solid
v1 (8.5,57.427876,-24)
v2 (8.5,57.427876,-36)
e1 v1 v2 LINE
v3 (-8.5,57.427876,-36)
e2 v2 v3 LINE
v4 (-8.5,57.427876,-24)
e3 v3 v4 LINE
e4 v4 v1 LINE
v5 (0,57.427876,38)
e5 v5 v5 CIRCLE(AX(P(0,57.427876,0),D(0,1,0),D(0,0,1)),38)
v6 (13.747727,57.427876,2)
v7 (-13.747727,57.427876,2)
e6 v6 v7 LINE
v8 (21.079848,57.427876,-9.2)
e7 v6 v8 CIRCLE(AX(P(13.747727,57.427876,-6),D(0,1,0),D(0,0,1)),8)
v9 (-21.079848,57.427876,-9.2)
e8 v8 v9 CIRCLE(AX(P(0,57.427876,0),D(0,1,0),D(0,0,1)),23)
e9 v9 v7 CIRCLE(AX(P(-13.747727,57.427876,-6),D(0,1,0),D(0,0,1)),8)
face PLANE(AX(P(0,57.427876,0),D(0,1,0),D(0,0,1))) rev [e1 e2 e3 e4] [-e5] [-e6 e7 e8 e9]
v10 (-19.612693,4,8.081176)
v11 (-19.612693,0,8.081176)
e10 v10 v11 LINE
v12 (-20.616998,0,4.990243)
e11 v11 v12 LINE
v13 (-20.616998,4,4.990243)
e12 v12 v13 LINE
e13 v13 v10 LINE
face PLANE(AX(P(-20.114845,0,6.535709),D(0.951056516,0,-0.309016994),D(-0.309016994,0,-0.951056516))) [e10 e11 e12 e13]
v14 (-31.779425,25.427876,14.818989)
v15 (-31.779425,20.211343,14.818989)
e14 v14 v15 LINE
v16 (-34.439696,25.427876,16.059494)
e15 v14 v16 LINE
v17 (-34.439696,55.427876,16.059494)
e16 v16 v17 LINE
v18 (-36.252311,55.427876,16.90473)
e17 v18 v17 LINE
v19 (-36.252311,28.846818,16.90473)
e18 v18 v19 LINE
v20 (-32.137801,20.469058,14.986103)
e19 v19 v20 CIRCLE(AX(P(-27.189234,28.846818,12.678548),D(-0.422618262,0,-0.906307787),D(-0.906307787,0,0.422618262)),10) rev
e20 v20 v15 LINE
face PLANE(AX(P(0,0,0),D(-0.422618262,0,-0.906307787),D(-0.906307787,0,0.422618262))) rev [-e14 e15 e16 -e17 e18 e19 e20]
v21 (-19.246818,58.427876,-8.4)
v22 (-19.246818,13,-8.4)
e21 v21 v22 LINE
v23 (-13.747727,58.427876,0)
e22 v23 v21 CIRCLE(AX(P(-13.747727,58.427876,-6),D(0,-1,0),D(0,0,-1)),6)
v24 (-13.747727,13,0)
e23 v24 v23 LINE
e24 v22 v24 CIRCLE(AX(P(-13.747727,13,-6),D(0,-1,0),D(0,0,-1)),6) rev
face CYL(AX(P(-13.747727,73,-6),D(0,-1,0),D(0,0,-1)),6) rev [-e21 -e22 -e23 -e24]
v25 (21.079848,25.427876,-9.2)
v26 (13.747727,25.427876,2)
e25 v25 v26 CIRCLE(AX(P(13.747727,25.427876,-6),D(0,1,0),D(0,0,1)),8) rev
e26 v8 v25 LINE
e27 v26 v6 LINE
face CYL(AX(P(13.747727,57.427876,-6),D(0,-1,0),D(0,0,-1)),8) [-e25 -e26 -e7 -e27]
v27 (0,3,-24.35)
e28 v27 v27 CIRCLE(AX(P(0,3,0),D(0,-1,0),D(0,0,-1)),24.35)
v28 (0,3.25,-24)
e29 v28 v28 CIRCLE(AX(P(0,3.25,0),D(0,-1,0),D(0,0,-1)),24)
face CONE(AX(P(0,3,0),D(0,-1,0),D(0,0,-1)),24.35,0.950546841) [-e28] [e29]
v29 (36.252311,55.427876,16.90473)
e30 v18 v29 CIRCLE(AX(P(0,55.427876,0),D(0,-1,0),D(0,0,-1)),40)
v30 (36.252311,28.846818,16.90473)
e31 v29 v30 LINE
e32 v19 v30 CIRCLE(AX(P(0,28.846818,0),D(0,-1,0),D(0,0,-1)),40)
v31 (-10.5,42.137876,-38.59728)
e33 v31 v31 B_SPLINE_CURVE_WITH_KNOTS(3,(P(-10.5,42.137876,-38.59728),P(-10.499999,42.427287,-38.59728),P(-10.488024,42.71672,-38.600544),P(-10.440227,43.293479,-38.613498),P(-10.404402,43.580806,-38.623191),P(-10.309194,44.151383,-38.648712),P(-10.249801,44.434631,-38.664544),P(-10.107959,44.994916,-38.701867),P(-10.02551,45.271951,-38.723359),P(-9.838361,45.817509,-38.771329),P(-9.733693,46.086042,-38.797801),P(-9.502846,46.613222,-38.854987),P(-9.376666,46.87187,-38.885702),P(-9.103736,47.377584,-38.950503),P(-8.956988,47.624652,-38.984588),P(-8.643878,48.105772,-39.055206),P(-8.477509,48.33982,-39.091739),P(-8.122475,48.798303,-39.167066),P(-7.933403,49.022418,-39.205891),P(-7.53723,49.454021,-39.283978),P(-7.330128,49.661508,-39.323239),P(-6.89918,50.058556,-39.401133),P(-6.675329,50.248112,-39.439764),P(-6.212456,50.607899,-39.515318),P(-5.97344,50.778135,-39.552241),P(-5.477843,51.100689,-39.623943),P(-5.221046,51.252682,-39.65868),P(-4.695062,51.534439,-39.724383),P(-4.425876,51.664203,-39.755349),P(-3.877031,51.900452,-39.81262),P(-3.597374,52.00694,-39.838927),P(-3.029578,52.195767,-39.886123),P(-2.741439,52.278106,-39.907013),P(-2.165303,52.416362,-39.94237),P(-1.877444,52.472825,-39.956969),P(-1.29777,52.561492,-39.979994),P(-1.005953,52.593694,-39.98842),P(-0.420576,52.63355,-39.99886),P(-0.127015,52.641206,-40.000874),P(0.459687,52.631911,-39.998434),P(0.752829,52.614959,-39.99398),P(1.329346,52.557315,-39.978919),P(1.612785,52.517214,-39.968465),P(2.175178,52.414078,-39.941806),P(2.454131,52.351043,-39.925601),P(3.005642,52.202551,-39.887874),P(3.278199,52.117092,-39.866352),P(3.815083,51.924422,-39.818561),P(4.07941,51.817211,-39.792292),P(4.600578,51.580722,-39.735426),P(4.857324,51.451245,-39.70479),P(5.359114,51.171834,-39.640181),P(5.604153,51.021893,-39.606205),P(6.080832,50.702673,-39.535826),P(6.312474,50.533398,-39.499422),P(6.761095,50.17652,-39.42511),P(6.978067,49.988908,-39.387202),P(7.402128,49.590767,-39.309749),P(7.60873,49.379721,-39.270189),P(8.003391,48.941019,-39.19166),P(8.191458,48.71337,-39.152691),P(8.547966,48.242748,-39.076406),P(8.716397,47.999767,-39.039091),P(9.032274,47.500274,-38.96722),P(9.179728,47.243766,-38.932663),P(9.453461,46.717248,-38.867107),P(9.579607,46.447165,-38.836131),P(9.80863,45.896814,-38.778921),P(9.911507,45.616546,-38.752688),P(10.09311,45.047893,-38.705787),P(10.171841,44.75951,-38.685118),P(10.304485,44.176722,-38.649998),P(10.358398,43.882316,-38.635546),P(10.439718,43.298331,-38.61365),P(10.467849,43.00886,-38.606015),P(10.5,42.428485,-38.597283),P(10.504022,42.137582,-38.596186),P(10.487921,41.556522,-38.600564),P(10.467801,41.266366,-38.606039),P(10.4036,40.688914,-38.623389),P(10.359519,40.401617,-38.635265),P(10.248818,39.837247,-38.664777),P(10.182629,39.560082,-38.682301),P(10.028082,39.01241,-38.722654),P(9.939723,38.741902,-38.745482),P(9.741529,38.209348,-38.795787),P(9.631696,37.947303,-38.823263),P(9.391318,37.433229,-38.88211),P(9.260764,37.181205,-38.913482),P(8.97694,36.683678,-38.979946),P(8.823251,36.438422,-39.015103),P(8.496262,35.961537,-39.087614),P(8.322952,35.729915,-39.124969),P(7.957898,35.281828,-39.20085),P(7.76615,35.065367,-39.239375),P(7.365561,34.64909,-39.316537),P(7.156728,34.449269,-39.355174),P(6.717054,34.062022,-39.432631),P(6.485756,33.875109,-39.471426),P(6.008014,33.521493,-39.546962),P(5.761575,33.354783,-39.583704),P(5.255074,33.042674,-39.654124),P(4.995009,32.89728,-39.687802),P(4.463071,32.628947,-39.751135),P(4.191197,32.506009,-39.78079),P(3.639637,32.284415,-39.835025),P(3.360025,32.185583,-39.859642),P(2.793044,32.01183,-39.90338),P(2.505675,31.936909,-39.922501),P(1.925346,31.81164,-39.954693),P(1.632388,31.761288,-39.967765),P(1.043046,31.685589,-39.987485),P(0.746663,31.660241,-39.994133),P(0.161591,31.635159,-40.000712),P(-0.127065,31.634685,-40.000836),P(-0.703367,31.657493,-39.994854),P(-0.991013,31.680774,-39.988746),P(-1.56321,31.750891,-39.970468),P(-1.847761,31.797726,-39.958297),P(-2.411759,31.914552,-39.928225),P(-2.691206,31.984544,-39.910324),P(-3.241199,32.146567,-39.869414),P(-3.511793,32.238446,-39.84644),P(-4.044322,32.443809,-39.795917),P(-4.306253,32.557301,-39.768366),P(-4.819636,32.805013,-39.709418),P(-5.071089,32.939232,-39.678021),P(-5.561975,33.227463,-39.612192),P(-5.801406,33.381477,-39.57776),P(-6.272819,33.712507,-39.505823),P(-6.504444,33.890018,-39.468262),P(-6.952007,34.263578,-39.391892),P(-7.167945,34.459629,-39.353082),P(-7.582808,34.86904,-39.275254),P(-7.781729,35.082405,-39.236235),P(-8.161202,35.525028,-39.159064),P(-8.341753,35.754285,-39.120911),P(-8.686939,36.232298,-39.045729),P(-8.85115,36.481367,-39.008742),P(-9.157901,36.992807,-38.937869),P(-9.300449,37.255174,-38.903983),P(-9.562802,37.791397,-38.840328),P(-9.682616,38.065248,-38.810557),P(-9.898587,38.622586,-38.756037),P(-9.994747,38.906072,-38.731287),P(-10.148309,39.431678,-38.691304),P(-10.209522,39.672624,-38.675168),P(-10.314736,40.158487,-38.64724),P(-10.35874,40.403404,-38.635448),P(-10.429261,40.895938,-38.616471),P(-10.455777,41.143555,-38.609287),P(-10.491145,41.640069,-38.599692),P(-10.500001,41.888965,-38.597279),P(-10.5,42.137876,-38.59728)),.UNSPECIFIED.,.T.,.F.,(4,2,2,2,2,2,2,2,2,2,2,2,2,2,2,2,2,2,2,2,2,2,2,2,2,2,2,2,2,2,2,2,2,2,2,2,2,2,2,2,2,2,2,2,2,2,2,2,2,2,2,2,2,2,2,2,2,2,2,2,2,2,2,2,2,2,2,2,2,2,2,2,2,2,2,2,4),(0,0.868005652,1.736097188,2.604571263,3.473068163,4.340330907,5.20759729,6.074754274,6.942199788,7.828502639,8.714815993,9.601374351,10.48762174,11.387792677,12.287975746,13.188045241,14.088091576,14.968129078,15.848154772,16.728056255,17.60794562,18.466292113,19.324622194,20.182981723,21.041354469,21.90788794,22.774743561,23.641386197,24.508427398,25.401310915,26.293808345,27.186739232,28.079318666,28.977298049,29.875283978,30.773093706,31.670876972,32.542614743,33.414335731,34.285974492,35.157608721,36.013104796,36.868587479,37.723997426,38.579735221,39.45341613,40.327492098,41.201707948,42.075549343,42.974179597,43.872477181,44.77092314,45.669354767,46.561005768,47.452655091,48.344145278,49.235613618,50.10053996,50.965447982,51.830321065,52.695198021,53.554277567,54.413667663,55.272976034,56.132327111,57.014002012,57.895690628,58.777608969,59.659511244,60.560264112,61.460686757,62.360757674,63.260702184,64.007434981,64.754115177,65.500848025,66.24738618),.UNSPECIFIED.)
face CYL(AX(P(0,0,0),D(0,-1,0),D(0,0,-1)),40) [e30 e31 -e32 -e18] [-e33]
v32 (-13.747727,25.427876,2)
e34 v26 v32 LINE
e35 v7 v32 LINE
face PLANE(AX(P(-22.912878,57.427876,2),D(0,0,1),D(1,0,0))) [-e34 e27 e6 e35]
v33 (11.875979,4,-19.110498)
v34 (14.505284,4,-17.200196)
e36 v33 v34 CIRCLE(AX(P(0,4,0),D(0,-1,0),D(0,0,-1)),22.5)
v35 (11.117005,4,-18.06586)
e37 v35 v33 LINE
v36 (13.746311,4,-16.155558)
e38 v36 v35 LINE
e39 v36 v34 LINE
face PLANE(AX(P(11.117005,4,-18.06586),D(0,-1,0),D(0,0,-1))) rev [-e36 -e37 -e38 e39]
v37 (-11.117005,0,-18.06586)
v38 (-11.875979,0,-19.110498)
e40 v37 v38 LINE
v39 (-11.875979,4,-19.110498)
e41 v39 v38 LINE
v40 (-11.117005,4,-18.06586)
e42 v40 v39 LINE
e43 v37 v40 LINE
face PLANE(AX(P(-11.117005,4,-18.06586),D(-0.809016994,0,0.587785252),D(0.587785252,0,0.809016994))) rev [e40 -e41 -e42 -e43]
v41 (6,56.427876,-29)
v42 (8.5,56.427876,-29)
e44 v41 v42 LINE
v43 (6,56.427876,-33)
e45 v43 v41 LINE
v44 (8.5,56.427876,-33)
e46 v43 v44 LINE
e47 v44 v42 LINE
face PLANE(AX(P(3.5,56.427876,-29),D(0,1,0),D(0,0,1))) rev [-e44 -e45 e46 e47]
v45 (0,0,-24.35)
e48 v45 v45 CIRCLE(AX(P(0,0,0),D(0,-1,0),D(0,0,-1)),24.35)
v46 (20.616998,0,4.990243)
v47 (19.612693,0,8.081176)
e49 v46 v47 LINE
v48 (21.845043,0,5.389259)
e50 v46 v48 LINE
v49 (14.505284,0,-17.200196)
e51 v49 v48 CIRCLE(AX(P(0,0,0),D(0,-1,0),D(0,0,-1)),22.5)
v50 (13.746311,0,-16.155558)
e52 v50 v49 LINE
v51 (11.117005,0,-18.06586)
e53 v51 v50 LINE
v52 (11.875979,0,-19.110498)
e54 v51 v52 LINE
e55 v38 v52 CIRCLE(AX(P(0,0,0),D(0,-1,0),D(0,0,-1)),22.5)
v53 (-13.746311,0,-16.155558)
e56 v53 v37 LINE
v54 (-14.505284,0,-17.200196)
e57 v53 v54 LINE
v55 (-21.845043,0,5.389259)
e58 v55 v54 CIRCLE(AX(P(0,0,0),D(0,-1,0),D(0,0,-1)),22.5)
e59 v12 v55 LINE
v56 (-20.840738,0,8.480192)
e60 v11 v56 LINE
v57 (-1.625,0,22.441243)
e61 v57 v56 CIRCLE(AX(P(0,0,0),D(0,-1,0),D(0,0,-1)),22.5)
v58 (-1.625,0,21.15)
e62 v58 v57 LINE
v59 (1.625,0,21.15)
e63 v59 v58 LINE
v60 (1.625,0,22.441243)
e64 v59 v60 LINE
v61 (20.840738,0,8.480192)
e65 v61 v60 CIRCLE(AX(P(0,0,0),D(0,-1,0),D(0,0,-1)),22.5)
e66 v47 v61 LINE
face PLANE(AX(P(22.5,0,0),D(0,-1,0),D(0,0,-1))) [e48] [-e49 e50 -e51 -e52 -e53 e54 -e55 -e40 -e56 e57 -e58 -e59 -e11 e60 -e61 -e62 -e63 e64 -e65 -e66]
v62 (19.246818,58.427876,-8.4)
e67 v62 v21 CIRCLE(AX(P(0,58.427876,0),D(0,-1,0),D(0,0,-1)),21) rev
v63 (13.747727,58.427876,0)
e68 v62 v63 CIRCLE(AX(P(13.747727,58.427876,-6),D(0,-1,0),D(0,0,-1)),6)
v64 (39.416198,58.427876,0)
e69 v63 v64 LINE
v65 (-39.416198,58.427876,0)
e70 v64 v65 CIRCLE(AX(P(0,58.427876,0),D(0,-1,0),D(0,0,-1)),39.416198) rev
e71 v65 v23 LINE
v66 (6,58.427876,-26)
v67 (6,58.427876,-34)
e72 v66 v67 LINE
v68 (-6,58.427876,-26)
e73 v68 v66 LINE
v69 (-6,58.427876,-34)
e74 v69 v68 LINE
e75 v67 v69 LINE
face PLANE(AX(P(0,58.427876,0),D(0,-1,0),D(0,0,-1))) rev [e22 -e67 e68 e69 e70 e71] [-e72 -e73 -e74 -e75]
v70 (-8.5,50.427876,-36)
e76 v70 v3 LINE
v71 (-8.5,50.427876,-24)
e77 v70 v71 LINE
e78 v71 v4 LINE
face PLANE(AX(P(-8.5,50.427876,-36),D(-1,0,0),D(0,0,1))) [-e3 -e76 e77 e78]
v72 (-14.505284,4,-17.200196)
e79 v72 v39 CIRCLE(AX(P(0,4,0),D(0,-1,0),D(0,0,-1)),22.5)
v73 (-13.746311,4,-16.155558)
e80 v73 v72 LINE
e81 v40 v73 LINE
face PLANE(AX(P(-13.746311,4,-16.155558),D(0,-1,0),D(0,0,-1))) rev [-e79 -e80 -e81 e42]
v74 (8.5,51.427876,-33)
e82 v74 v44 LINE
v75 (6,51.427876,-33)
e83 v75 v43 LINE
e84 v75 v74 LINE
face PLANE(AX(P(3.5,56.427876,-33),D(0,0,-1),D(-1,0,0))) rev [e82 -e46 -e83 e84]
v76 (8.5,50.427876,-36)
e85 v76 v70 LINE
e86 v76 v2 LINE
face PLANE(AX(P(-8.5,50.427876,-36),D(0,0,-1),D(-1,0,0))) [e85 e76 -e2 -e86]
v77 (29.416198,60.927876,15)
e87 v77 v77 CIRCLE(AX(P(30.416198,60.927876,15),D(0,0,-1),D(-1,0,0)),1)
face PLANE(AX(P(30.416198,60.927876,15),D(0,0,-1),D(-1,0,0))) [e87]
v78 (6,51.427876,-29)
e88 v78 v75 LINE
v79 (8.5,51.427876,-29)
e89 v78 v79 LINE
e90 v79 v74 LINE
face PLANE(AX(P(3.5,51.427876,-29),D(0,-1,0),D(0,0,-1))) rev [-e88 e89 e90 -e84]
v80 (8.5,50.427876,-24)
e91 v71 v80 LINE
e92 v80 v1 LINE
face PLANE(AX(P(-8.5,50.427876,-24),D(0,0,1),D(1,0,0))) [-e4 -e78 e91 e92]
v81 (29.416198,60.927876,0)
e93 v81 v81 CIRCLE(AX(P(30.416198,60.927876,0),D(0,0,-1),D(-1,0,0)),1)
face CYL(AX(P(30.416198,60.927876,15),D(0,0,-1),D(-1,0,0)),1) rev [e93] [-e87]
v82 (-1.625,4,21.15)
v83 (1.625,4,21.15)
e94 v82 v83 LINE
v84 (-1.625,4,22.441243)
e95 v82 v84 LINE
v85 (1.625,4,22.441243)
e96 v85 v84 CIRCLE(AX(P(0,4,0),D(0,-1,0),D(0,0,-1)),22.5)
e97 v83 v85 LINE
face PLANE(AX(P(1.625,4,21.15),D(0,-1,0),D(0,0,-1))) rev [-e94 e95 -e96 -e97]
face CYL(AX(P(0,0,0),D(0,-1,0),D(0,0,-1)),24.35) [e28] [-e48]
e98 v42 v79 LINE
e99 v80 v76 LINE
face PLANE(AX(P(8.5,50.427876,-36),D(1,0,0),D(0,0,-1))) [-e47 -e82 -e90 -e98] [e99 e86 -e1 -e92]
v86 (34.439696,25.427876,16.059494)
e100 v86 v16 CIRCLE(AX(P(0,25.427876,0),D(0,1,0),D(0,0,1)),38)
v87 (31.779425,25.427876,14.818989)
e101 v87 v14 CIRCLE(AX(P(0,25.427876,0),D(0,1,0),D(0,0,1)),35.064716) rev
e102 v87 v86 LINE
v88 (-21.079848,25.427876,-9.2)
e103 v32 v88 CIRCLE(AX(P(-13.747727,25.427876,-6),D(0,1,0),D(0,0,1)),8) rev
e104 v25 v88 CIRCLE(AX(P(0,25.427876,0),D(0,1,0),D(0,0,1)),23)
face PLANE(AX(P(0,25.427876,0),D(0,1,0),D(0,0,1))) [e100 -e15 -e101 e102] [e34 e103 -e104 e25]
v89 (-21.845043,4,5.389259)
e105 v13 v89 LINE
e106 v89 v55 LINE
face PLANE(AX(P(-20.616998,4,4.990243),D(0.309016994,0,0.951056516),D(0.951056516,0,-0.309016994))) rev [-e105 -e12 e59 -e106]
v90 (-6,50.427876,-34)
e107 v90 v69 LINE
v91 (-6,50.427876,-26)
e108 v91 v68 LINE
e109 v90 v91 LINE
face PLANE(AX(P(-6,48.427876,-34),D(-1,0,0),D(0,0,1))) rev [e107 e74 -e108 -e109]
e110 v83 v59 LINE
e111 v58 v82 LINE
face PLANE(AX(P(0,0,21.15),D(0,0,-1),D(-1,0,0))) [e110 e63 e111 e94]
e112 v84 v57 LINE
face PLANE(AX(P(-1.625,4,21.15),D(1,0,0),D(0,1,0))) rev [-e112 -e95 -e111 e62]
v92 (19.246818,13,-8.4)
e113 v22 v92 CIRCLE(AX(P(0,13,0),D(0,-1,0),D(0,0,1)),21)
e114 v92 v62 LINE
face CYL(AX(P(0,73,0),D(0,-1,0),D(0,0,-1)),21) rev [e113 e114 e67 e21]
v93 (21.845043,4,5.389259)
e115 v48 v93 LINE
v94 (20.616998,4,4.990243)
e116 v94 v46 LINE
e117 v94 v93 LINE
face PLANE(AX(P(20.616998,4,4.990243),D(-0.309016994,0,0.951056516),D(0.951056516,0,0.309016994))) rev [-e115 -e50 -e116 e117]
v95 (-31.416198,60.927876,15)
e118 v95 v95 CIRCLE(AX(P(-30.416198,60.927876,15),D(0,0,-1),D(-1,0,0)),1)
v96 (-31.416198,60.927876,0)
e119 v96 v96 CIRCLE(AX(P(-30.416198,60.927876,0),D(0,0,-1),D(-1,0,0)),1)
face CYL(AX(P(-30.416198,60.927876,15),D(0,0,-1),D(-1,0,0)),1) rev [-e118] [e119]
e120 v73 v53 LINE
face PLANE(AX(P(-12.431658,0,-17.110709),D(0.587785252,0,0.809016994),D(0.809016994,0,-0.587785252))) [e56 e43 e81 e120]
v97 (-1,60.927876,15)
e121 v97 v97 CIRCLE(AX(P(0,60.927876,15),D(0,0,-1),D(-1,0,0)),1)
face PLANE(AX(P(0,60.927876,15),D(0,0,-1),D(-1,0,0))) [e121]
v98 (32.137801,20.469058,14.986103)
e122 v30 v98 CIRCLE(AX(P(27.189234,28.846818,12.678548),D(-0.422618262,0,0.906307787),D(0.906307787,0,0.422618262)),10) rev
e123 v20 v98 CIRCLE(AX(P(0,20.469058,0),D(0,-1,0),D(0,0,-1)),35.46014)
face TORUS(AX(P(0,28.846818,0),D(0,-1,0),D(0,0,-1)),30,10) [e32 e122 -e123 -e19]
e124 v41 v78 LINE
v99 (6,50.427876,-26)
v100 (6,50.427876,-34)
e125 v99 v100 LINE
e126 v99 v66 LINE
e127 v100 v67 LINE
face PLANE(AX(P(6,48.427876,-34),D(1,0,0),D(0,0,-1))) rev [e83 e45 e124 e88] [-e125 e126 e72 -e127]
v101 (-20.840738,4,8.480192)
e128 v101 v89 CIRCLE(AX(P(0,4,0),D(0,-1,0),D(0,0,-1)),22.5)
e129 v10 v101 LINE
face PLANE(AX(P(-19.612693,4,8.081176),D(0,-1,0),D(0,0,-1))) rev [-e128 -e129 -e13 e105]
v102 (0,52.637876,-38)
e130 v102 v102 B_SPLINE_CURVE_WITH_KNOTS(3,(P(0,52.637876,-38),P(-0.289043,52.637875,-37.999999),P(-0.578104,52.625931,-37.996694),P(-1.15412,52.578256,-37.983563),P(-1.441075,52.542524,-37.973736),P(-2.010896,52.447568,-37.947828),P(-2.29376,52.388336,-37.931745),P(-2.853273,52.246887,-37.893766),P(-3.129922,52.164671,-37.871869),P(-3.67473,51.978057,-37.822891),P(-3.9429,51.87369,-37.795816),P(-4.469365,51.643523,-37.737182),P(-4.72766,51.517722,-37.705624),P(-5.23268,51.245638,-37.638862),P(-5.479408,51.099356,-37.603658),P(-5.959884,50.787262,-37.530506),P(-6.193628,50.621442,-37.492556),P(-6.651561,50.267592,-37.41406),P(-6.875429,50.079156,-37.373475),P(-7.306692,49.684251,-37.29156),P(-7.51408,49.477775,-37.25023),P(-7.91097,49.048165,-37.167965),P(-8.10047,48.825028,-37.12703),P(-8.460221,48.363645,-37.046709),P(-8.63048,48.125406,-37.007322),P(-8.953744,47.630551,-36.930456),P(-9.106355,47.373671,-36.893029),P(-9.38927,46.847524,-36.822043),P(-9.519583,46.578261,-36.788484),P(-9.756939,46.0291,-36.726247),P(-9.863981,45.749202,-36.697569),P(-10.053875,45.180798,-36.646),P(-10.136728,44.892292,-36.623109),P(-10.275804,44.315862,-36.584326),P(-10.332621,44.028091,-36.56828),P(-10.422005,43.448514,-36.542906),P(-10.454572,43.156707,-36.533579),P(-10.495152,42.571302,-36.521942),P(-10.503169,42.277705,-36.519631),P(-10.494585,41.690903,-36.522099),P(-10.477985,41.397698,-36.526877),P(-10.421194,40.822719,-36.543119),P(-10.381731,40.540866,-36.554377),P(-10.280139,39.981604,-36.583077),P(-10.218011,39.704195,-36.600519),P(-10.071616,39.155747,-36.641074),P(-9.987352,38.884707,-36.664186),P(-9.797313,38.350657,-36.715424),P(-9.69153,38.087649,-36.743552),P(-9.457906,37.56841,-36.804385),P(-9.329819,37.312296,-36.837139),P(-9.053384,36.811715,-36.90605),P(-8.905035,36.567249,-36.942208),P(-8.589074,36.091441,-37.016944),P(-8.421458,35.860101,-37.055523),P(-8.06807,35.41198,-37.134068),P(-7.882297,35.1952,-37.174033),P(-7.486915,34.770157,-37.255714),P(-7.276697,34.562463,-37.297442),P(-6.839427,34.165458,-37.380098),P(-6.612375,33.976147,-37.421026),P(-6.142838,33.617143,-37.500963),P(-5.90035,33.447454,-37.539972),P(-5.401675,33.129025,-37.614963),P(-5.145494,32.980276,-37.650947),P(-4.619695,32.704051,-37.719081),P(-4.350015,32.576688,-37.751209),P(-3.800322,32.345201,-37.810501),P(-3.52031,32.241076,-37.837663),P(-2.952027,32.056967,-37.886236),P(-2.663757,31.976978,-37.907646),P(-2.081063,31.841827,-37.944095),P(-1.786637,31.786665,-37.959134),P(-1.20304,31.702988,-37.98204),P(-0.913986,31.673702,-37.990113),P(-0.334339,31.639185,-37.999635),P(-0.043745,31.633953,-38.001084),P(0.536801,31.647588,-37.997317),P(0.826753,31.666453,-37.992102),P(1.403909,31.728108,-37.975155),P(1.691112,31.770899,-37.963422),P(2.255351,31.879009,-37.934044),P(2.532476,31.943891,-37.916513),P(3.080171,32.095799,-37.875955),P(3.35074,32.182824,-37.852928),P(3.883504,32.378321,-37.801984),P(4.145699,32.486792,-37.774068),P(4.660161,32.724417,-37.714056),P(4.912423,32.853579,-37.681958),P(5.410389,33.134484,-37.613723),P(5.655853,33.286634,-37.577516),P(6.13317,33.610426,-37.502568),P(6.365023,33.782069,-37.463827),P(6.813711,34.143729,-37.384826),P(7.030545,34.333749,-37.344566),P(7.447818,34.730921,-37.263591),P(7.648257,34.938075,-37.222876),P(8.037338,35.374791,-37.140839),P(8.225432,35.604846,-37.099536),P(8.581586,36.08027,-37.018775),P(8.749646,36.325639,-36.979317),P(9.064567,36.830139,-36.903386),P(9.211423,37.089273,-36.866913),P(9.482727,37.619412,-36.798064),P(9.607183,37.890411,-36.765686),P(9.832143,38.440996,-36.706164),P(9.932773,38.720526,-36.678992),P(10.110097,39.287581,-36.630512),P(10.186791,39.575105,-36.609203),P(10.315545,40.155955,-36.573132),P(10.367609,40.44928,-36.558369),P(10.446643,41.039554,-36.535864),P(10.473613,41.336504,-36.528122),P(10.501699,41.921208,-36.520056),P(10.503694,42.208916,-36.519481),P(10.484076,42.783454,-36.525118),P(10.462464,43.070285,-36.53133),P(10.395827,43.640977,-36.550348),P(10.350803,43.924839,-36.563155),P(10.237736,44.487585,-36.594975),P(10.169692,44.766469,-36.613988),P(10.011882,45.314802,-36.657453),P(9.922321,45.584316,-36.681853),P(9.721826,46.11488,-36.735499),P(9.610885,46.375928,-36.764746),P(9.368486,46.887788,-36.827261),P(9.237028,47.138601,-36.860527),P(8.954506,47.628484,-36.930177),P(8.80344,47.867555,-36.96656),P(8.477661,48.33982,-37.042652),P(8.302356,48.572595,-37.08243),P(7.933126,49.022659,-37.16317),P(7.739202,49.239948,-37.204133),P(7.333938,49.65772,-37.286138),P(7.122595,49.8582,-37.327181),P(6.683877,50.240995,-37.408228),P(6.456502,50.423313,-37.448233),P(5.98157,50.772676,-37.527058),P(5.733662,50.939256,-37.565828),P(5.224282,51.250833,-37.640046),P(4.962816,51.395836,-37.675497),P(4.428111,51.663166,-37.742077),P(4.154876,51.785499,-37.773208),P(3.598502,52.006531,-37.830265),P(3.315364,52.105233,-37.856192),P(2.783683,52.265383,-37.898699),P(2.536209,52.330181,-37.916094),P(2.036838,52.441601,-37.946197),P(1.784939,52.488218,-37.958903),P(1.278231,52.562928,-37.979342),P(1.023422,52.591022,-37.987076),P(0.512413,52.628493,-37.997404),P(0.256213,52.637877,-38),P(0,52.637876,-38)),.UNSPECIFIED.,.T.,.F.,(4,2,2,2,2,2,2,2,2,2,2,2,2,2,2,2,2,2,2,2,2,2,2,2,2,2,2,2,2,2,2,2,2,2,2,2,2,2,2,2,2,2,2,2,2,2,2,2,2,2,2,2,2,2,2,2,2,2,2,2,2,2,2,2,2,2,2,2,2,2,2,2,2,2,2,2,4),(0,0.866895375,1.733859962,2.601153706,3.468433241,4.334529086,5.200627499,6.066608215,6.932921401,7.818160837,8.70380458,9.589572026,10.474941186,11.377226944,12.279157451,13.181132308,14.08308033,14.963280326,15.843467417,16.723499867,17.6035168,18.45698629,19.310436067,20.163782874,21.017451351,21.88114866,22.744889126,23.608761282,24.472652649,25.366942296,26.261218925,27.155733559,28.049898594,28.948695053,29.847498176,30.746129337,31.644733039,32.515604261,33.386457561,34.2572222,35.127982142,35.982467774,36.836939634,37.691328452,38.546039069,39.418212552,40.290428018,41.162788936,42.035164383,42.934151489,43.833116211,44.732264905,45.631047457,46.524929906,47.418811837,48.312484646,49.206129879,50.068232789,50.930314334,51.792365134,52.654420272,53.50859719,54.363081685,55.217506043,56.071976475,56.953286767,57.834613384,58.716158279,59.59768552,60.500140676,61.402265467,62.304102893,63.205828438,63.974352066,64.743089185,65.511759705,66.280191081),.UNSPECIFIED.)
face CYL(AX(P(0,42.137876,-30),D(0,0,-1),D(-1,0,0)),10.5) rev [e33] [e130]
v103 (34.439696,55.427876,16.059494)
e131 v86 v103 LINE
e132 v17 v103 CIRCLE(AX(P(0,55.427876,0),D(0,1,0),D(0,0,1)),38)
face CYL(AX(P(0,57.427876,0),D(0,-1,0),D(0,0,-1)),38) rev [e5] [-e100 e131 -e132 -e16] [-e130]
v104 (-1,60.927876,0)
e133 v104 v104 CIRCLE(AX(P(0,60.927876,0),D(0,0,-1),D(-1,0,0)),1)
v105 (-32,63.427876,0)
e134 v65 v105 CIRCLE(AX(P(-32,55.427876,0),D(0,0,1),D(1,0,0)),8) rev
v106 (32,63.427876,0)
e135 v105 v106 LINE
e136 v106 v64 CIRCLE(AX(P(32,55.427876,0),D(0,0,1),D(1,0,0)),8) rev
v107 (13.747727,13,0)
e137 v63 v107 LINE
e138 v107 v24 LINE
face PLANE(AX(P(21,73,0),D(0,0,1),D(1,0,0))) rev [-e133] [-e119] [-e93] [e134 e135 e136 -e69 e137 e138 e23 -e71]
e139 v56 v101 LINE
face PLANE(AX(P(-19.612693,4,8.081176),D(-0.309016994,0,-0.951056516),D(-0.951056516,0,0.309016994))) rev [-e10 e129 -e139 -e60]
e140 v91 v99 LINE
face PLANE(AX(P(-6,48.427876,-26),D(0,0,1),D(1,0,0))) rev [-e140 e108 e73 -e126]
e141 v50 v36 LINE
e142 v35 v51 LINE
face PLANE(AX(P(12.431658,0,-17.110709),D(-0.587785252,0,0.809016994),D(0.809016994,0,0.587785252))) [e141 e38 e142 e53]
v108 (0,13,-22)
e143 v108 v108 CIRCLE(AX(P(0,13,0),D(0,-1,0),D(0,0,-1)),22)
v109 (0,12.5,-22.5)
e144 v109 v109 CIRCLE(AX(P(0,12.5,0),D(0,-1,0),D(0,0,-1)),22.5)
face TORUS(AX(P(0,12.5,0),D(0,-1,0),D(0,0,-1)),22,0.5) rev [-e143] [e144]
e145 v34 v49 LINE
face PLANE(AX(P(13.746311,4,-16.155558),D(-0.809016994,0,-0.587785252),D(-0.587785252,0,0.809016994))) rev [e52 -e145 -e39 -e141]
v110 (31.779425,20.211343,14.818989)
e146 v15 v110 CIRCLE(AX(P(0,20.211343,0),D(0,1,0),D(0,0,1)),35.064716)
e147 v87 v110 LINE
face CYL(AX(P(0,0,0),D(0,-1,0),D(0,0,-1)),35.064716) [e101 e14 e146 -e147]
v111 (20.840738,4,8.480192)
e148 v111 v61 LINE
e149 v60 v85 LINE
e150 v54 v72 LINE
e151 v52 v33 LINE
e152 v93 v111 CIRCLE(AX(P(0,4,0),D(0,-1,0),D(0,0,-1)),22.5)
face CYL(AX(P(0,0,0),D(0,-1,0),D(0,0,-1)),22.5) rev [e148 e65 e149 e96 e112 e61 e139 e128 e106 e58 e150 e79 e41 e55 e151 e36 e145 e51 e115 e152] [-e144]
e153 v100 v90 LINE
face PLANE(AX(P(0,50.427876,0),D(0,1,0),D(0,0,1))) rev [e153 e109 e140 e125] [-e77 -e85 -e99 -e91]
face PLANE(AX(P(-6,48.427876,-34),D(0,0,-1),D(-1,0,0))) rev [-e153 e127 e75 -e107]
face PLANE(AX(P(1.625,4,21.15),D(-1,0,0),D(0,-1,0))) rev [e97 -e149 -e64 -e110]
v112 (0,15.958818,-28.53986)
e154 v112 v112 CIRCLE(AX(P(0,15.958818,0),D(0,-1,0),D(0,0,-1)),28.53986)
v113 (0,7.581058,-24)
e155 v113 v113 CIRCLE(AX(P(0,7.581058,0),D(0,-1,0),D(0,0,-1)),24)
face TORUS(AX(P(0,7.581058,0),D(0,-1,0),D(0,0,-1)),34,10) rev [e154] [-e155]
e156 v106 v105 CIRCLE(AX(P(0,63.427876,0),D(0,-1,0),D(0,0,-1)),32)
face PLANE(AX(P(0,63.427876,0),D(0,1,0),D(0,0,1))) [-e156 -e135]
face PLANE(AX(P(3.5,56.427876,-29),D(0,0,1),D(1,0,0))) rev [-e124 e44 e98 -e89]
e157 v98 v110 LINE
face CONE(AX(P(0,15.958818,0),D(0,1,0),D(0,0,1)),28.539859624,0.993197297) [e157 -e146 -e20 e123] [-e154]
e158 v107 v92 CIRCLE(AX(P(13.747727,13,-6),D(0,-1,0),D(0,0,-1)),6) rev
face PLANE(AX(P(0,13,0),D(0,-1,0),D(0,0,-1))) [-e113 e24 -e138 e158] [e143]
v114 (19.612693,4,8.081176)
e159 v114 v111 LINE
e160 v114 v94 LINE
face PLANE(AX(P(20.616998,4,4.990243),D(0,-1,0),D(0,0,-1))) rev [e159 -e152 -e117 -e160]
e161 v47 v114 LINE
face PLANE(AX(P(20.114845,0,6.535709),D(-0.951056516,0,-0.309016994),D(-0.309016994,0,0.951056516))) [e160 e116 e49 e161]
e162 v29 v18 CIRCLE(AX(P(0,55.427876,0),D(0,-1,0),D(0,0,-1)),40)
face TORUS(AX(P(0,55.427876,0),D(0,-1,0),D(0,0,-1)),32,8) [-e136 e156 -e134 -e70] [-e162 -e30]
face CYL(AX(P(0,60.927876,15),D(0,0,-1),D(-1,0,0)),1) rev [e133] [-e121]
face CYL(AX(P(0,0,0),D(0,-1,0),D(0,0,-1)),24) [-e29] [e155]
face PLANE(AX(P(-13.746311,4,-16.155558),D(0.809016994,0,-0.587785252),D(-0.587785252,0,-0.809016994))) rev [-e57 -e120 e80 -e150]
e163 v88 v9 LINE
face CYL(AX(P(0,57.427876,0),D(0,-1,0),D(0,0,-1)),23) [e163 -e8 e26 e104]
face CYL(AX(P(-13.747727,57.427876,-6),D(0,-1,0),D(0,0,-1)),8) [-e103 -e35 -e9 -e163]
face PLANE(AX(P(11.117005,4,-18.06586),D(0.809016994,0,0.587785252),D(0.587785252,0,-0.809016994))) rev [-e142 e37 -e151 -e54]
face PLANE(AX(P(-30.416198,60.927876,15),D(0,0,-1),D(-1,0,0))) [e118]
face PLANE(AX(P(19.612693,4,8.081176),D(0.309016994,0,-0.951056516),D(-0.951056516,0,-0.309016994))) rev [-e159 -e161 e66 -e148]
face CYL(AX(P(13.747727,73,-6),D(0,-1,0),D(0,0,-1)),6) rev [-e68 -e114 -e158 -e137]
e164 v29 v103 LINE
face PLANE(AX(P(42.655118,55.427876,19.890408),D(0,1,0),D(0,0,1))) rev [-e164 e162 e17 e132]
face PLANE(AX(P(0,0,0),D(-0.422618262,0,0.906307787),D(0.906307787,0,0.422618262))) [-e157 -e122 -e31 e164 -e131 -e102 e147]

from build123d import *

# Parameters (mm, degrees)
CUT_EXTRUDE3_DEPTH           = 60
CUT_EXTRUDE5_DEPTH           = 2
CUT_EXTRUDE5_DEPTH_BACK      = 30
SKETCH9_R                    = 38
SKETCH9_R_2                  = 23
SKETCH19_W                   = 12
SKETCH19_H                   = 36.5
CUT_REVOLVE2_ANGLE           = 65
CUT_REVOLVE2_OTHER_WAY_ANGLE = 65
SKETCH21_W                   = 3.25
SKETCH21_H                   = 4
BOSS_EXTRUDE3_DEPTH          = 1.35
CIRPATTERN1_COUNT            = 5
CUT_EXTRUDE9_START           = -5
CUT_EXTRUDE9_DEPTH           = 5
SKETCH23_R                   = 10.5
CUT_EXTRUDE10_DEPTH          = 10
SKETCH24_W                   = 17
SKETCH24_H                   = 12
BOSS_EXTRUDE4_DEPTH          = 8
SKETCH26_W                   = 12
SKETCH26_H                   = 8
CUT_EXTRUDE11_DEPTH          = 10
SKETCH27_W                   = 4
SKETCH27_H                   = 5
CUT_EXTRUDE12_DEPTH          = 5
CUT_EXTRUDE14_DEPTH          = 2
CUT_EXTRUDE14_DEPTH_BACK     = 30
SKETCH29_R                   = 1
CUT_EXTRUDE15_DEPTH          = 15
FILLET1_R                    = 6
FILLET2_R                    = 8


with BuildPart() as part:
    # Sketch1 → Revolve1 (revolve)
    with BuildSketch(Plane.XY):
        with BuildLine():
            Line((0, 63.427876097), (32, 63.427876097))
            ThreePointArc((32, 63.427876097), (37.656854249, 61.084730346), (40, 55.427876097))
            Line((40, 55.427876097), (40, 28.846818009))
            ThreePointArc((40, 28.846818009), (38.792081772, 24.082439968), (35.460140376, 20.469057744))
            Line((35.460140376, 20.469057744), (28.539859624, 15.958818353))
            ThreePointArc((28.539859624, 15.958818353), (25.207918228, 12.345436129), (24, 7.581058088))
            Line((24, 7.581058088), (24, 3.25))
            Line((24, 3.25), (24.35, 3))
            Line((24.35, 3), (24.35, 0))
            Line((24.35, 0), (22.5, 0))
            Line((22.5, 0), (22.5, 12.5))
            ThreePointArc((22.5, 12.5), (22.353553391, 12.853553391), (22, 13))
            Line((22, 13), (0, 13))
            Line((0, 13), (0, 63.427876097))
        make_face()
    revolve(axis=Axis((0, 0, 0), (0, 1, 0)))

    # Sketch11 → Cut-Extrude3 (cut)
    with BuildSketch(Plane(origin=(0, 13, 0), x_dir=(-1, 0, 0), z_dir=(0, -1, 0))):
        with BuildLine():
            Line((-21, 0), (21, 0))
            ThreePointArc((21, 0), (0, 21), (-21, 0))
        make_face()
    extrude(amount=-CUT_EXTRUDE3_DEPTH, mode=Mode.SUBTRACT)

    # Sketch9 → Cut-Extrude5 (cut, two sides: drawn at the far end of the back side and taken through both)
    with BuildSketch(Plane(origin=(0, 55.427876097, 0), x_dir=(1, 0, 0), z_dir=(0, 1, 0)).offset(-CUT_EXTRUDE5_DEPTH_BACK)):
        Circle(SKETCH9_R)
        Circle(SKETCH9_R_2, mode=Mode.SUBTRACT)
    extrude(amount=CUT_EXTRUDE5_DEPTH + CUT_EXTRUDE5_DEPTH_BACK, mode=Mode.SUBTRACT)

    # Sketch19 → Cut-Revolve2 (revolve, cut)
    with BuildSketch(Plane(origin=(0, 0, 0), x_dir=(0, 0, -1), z_dir=(1, 0, 0))):
        with Locations((-41.064715832, 37.177876097)):
            Rectangle(SKETCH19_W, SKETCH19_H)
    revolve(axis=Axis((0, 0, 0), (0, 1, 0)), revolution_arc=CUT_REVOLVE2_ANGLE, mode=Mode.SUBTRACT)

    # Sketch19 → Cut-Revolve2 other way (revolve, cut)
    with BuildSketch(Plane(origin=(0, 0, 0), x_dir=(0, 0, -1), z_dir=(1, 0, 0))):
        with Locations((-41.064715832, 37.177876097)):
            Rectangle(SKETCH19_W, SKETCH19_H)
    revolve(axis=Axis((0, 0, 0), (0, -1, 0)), revolution_arc=CUT_REVOLVE2_OTHER_WAY_ANGLE, mode=Mode.SUBTRACT)

    # Sketch21 → Boss-Extrude3 (add)
    with BuildSketch(Plane(origin=(0, 0, 22.5), x_dir=(-1, 0, 0), z_dir=(0, 0, -1))):
        with Locations((0, 2)):
            Rectangle(SKETCH21_W, SKETCH21_H)
    boss_extrude3 = extrude(amount=BOSS_EXTRUDE3_DEPTH)

    # CirPattern1: Boss-Extrude3 ×5 about axis
    cirpattern1_axis = Axis((0, 0, 0), (0, -1, 0))
    for i in range(1, CIRPATTERN1_COUNT):
        add(boss_extrude3.rotate(cirpattern1_axis, i * 360 / CIRPATTERN1_COUNT))

    # Sketch22 → Cut-Extrude9 (cut)
    with BuildSketch(Plane(origin=(0, 63.427876097, 0), x_dir=(1, 0, 0), z_dir=(0, 1, 0)).offset(CUT_EXTRUDE9_START)):
        with BuildLine():
            Line((-40, 0), (40, 0))
            ThreePointArc((40, 0), (0, 40), (-40, 0))
        make_face()
    extrude(amount=CUT_EXTRUDE9_DEPTH, mode=Mode.SUBTRACT)

    # Sketch23 → Cut-Extrude10 (cut)
    with BuildSketch(Plane(origin=(0, 0, -40), x_dir=(-1, 0, 0), z_dir=(0, 0, -1))):
        with Locations((0, 42.137876097)):
            Circle(SKETCH23_R)
    extrude(amount=-CUT_EXTRUDE10_DEPTH, mode=Mode.SUBTRACT)

    # Sketch24 → Boss-Extrude4 (add)
    with BuildSketch(Plane(origin=(0, 58.427876097, 0), x_dir=(1, 0, 0), z_dir=(0, 1, 0))):
        with Locations((0, 30)):
            Rectangle(SKETCH24_W, SKETCH24_H)
    extrude(amount=-BOSS_EXTRUDE4_DEPTH)

    # Sketch26 → Cut-Extrude11 (cut)
    with BuildSketch(Plane(origin=(0, 58.427876097, 0), x_dir=(1, 0, 0), z_dir=(0, 1, 0))):
        with Locations((0, 30)):
            Rectangle(SKETCH26_W, SKETCH26_H)
    extrude(amount=-CUT_EXTRUDE11_DEPTH, mode=Mode.SUBTRACT)

    # Sketch27 → Cut-Extrude12 (cut)
    with BuildSketch(Plane(origin=(8.5, 0, 0), x_dir=(0, 0, -1), z_dir=(1, 0, 0))):
        with Locations((31, 53.927876097)):
            Rectangle(SKETCH27_W, SKETCH27_H)
    extrude(amount=-CUT_EXTRUDE12_DEPTH, mode=Mode.SUBTRACT)

    # Sketch28 → Cut-Extrude14 (cut, two sides: drawn at the far end of the back side and taken through both)
    with BuildSketch(Plane(origin=(0, 55.427876097, 0), x_dir=(1, 0, 0), z_dir=(0, 1, 0)).offset(-CUT_EXTRUDE14_DEPTH_BACK)):
        with BuildLine():
            Line((-22.912878475, -2), (22.912878475, -2))
            ThreePointArc((22.912878475, -2), (0, -23), (-22.912878475, -2))
        make_face()
    extrude(amount=CUT_EXTRUDE14_DEPTH + CUT_EXTRUDE14_DEPTH_BACK, mode=Mode.SUBTRACT)

    # Sketch29 → Cut-Extrude15 (cut)
    with BuildSketch(Plane(origin=(0, 0, 0), x_dir=(-1, 0, 0), z_dir=(0, 0, -1))):
        with Locations((-30.416198487, 60.927876097)):
            Circle(SKETCH29_R)
        with Locations((30.416198487, 60.927876097)):
            Circle(SKETCH29_R)
        with Locations((0, 60.927876097)):
            Circle(SKETCH29_R)
    extrude(amount=-CUT_EXTRUDE15_DEPTH, mode=Mode.SUBTRACT)

    # Fillet1
    fillet1_edges = [part.edges().sort_by_distance(p)[0] for p in [
        (-21, 35.713938048, 0),
        (21, 35.713938048, 0),
    ]]
    fillet(fillet1_edges, radius=FILLET1_R)

    # Fillet2
    fillet2_edges = [part.edges().sort_by_distance(p)[0] for p in [
        (22.912878475, 41.427876097, 2),
        (-22.912878475, 41.427876097, 2),
    ]]
    fillet(fillet2_edges, radius=FILLET2_R)


solid = part.part
